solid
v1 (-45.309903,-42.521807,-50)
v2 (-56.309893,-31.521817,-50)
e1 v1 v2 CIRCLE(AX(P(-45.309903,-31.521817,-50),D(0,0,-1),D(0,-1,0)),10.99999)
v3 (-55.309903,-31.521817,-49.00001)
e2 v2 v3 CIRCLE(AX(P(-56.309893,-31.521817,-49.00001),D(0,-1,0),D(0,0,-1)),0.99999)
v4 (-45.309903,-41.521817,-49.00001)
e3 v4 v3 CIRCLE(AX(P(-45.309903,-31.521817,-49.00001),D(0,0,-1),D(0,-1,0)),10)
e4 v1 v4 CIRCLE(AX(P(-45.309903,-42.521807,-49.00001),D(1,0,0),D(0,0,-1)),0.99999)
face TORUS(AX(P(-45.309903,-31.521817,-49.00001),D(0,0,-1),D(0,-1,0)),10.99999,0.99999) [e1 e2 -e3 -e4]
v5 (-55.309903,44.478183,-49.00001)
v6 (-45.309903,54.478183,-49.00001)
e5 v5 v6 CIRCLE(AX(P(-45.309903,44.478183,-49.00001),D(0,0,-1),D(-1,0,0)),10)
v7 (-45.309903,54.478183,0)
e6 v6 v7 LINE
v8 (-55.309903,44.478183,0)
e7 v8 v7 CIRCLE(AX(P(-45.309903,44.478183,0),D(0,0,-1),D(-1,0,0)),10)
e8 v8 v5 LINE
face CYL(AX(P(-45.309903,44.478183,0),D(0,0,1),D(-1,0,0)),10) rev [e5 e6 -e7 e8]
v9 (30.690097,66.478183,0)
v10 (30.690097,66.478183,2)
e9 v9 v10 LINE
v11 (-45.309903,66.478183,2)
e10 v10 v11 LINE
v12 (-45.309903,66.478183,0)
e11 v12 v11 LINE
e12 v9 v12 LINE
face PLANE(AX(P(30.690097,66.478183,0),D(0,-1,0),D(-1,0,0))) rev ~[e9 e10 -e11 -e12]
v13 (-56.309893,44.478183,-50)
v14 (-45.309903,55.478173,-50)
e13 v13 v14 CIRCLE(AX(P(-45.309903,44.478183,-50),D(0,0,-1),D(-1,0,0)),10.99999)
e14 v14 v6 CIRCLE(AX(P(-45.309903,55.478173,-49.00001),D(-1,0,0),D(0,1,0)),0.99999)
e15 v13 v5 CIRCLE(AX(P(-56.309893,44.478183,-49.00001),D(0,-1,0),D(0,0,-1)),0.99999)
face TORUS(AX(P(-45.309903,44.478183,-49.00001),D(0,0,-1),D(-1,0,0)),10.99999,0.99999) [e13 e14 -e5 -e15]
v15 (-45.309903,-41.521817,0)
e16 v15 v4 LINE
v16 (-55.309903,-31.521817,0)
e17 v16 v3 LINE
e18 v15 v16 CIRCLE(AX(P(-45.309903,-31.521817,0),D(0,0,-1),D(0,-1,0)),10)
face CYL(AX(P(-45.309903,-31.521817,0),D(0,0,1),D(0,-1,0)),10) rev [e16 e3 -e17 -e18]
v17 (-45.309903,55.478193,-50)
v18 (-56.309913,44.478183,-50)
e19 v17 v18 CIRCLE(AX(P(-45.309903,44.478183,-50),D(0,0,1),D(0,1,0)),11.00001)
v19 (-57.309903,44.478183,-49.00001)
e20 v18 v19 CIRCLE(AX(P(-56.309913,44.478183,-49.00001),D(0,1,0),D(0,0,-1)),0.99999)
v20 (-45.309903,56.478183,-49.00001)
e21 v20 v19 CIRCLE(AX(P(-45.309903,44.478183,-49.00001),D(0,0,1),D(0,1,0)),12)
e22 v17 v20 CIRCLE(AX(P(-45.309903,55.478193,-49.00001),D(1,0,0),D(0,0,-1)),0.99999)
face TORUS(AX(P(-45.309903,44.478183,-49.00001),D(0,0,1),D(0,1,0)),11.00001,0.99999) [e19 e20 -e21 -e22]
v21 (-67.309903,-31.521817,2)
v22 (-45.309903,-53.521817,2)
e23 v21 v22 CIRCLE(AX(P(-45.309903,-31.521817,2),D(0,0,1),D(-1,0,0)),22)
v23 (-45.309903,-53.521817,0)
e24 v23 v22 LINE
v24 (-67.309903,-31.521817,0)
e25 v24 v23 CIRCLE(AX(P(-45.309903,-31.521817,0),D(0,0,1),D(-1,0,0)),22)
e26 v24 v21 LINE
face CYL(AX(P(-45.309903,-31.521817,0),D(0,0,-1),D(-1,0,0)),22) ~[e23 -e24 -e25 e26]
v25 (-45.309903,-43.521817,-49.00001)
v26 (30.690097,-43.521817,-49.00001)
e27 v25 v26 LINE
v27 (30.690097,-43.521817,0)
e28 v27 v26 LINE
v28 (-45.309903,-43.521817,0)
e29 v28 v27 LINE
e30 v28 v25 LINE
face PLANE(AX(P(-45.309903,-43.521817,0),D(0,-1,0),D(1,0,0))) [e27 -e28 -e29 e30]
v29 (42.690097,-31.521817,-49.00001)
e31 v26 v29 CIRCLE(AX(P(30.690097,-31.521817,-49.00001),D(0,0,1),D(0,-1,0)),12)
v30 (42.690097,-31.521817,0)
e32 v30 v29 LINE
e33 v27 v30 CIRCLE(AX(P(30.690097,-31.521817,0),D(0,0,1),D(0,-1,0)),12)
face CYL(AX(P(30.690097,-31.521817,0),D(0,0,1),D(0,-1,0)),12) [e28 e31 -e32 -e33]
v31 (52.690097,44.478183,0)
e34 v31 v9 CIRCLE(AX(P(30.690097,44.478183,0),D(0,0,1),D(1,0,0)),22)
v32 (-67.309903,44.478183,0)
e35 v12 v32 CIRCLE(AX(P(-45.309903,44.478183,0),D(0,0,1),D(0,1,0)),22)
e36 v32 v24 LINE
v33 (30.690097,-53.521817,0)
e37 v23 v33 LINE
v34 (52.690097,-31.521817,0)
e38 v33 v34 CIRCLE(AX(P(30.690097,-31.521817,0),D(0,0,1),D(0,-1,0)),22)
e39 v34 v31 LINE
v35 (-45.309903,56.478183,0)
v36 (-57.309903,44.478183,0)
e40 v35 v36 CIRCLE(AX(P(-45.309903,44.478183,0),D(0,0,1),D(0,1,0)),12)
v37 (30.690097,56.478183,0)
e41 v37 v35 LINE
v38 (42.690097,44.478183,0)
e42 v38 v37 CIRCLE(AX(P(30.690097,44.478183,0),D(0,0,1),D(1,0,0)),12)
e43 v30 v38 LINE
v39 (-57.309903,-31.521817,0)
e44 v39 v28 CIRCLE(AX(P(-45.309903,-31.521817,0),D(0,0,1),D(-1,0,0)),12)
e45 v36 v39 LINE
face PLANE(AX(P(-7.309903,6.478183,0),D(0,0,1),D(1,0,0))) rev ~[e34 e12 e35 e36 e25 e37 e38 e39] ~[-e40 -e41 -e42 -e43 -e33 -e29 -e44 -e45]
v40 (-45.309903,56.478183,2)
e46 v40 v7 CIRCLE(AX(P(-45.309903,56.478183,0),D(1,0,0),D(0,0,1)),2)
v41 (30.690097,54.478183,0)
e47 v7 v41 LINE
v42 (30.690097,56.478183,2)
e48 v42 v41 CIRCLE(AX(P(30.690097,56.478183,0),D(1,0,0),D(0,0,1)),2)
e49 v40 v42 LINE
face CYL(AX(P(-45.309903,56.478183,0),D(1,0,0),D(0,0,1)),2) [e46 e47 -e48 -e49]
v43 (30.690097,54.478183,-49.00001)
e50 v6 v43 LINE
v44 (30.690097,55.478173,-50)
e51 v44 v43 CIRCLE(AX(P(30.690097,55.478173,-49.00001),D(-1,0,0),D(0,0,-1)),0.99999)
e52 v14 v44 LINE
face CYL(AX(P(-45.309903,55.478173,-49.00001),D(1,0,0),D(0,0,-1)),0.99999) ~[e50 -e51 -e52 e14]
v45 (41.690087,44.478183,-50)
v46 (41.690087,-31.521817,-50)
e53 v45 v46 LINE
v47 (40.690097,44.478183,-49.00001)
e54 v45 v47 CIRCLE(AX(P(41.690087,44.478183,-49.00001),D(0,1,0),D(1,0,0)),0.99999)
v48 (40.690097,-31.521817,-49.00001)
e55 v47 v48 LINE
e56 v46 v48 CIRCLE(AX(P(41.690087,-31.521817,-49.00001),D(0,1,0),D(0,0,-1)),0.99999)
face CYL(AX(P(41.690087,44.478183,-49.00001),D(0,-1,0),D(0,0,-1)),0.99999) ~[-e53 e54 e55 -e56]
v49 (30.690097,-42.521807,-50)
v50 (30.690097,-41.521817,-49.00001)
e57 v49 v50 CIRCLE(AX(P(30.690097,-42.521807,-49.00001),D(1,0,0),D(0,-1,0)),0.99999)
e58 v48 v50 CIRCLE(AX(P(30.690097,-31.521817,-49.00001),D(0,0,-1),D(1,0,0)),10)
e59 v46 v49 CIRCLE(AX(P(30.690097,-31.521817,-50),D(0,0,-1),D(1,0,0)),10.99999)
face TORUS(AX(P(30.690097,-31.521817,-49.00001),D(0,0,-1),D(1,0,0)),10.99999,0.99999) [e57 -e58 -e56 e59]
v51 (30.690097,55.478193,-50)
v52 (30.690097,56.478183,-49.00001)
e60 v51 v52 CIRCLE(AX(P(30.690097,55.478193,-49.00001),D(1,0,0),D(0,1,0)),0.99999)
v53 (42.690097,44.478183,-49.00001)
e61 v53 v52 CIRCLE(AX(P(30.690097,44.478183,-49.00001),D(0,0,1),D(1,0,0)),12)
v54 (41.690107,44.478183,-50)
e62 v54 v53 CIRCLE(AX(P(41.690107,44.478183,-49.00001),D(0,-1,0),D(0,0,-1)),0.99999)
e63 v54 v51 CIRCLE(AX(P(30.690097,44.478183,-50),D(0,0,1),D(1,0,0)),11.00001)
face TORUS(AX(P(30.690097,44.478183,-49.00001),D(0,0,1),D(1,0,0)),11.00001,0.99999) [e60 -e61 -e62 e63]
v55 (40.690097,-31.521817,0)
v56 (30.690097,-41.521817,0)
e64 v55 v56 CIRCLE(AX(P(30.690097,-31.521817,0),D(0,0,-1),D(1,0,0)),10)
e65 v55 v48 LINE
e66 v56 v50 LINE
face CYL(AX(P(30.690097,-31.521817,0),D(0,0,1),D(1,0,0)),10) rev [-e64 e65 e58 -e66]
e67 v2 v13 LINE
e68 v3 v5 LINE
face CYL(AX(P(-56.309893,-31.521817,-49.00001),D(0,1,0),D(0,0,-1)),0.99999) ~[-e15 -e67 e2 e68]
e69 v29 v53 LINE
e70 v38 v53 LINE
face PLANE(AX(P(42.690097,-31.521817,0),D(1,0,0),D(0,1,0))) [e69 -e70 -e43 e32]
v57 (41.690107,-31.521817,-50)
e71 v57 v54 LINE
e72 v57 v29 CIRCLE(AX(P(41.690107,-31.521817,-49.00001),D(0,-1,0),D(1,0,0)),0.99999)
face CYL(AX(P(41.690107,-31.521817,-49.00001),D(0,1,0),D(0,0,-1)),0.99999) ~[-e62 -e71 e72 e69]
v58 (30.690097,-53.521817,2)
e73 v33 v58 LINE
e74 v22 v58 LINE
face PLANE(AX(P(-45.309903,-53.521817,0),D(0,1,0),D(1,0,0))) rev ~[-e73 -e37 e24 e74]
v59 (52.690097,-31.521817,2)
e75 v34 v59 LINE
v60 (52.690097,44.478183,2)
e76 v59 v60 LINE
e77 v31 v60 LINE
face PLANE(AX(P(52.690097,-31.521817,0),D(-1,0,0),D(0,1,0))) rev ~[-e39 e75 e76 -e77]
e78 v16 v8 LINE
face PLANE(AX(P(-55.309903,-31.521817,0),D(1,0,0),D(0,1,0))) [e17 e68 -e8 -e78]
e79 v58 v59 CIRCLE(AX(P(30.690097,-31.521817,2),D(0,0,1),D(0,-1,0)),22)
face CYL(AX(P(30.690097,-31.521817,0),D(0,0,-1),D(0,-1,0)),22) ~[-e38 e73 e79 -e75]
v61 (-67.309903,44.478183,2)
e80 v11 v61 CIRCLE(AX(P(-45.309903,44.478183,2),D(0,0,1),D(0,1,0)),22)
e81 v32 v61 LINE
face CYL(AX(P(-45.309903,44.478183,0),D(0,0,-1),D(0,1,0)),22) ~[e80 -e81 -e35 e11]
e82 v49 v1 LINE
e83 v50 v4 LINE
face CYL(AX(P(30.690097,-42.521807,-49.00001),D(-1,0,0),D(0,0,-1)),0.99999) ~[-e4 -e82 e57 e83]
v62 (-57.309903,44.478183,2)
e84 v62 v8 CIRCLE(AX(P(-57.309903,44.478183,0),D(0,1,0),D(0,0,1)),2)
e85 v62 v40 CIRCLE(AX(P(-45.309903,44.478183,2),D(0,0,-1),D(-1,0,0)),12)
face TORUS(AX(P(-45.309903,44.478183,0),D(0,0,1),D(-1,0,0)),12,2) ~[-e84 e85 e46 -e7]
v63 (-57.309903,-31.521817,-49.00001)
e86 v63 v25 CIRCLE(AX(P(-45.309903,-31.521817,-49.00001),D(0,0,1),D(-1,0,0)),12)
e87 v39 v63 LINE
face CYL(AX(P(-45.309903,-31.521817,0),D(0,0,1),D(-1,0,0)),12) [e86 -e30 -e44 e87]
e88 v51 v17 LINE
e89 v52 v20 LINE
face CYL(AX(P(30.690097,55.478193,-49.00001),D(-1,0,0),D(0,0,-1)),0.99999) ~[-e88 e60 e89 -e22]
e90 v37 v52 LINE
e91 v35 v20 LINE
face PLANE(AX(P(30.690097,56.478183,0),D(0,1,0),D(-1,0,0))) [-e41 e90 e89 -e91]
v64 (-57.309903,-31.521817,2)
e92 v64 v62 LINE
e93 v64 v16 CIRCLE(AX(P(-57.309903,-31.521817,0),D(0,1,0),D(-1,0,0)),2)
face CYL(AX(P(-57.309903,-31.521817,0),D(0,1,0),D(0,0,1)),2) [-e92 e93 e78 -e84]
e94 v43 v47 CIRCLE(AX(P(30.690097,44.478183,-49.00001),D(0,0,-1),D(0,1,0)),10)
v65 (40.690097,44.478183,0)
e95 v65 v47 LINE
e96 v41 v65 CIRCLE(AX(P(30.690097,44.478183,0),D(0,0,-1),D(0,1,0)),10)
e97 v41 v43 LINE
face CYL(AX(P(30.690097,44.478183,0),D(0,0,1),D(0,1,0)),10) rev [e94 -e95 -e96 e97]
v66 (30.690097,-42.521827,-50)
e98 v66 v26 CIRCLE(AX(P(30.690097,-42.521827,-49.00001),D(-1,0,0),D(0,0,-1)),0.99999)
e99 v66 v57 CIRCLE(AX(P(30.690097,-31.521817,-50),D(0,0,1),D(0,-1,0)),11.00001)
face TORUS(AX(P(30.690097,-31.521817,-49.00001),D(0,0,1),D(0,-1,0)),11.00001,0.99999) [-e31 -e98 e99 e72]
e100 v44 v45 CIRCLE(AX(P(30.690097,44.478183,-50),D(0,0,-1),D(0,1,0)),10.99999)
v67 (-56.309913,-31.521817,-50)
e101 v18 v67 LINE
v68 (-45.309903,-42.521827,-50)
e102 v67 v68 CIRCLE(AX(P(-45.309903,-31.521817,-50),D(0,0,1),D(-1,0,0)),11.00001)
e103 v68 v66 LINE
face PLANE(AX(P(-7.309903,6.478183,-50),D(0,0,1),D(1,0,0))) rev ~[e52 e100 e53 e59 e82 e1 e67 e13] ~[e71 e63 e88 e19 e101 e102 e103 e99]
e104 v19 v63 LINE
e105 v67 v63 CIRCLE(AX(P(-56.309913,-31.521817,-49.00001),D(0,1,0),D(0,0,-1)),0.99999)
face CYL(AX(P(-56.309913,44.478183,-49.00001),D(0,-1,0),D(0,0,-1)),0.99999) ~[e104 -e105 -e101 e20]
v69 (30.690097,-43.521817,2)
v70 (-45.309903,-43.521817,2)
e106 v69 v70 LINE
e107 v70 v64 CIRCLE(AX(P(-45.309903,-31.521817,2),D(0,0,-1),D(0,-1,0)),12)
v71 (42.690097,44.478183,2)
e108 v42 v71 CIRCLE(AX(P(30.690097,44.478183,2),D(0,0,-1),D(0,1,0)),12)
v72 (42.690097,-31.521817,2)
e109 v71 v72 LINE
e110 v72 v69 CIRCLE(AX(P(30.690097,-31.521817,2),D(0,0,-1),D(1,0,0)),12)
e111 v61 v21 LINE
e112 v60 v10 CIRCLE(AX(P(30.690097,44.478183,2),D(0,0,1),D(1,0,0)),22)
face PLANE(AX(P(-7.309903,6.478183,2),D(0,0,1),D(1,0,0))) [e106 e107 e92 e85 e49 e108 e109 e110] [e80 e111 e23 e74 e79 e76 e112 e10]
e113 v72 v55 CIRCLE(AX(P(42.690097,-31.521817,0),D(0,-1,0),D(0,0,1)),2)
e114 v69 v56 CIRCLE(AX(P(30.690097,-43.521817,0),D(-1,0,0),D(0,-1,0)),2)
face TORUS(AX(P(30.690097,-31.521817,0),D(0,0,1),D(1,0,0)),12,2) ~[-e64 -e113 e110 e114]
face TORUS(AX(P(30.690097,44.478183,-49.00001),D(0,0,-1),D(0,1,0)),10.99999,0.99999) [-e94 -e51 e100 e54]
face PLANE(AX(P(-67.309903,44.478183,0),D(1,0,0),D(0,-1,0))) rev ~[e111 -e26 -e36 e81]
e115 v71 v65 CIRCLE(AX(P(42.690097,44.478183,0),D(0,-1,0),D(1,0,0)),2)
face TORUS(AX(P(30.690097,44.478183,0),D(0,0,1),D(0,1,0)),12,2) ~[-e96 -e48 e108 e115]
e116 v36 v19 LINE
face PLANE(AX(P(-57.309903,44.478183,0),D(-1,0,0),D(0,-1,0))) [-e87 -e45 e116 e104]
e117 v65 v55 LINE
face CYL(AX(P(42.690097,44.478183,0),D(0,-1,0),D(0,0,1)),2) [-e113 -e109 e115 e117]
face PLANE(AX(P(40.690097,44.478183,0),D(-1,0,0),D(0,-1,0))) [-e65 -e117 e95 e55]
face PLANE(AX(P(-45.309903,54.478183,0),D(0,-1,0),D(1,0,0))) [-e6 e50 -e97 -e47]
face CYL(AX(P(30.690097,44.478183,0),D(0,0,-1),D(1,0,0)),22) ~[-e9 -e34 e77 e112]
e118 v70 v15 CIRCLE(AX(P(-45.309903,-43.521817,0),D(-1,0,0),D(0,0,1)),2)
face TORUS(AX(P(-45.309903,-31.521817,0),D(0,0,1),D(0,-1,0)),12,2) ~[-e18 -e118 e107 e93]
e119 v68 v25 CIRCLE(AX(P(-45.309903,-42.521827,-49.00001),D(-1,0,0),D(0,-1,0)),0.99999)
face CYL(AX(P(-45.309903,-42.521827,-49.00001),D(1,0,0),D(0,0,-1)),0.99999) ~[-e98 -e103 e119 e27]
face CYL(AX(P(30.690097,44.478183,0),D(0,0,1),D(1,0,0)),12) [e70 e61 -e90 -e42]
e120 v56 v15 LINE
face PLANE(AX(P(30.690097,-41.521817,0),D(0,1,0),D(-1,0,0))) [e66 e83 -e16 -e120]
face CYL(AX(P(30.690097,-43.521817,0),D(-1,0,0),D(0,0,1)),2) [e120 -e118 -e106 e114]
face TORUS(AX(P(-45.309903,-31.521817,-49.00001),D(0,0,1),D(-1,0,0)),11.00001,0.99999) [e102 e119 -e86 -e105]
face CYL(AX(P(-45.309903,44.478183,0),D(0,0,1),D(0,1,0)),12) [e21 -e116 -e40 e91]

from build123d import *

# Parameters (mm, degrees)
F1_DEPTH = 2
F3_DEPTH = 50
F4_R     = 0.99999
F5_R     = 2


# Not quite as in the source:
# - a fillet or chamfer is up to 0.001 mm smaller than in the source, because OpenCascade refuses the exact size


with BuildPart() as f1:
    # F0 (on Top) → F1 (new body)
    with BuildSketch(Plane.XY):
        with BuildLine():
            Line((-67.3099028766, 44.4781833887), (-67.3099028766, -31.5218166113))
            ThreePointArc((-67.3099028766, -31.5218166113), (-60.8662520627, -47.0781657974), (-45.3099028766, -53.5218166113))
            Line((-45.3099028766, -53.5218166113), (30.6900971234, -53.5218166113))
            ThreePointArc((30.6900971234, -53.5218166113), (46.2464463095, -47.0781657974), (52.6900971234, -31.5218166113))
            Line((52.6900971234, -31.5218166113), (52.6900971234, 44.4781833887))
            ThreePointArc((52.6900971234, 44.4781833887), (46.2464463095, 60.0345325748), (30.6900971234, 66.4781833887))
            Line((30.6900971234, 66.4781833887), (-45.3099028766, 66.4781833887))
            ThreePointArc((-45.3099028766, 66.4781833887), (-60.8662520627, 60.0345325748), (-67.3099028766, 44.4781833887))
        make_face()
        with BuildLine():
            ThreePointArc((-55.3099028766, 44.4781833887), (-52.3809706885, 51.5492512006), (-45.3099028766, 54.4781833887))
            Line((-45.3099028766, 54.4781833887), (30.6900971234, 54.4781833887))
            ThreePointArc((30.6900971234, 54.4781833887), (37.7611649352, 51.5492512006), (40.6900971234, 44.4781833887))
            Line((40.6900971234, 44.4781833887), (40.6900971234, -31.5218166113))
            ThreePointArc((40.6900971234, -31.5218166113), (37.7611649352, -38.5928844232), (30.6900971234, -41.5218166113))
            Line((30.6900971234, -41.5218166113), (-45.3099028766, -41.5218166113))
            ThreePointArc((-45.3099028766, -41.5218166113), (-52.3809706885, -38.5928844232), (-55.3099028766, -31.5218166113))
            Line((-55.3099028766, -31.5218166113), (-55.3099028766, 44.4781833887))
        make_face(mode=Mode.SUBTRACT)
    extrude(amount=F1_DEPTH)

    # F2 (on Top) → F3 (join)
    with BuildSketch(Plane.XY):
        with BuildLine():
            Line((-45.3099028766, -43.5218166113), (30.6900971234, -43.5218166113))
            ThreePointArc((30.6900971234, -43.5218166113), (39.1753784976, -40.0070979855), (42.6900971234, -31.5218166113))
            Line((42.6900971234, -31.5218166113), (42.6900971234, 44.4781833887))
            ThreePointArc((42.6900971234, 44.4781833887), (39.1753784976, 52.9634647629), (30.6900971234, 56.4781833887))
            Line((30.6900971234, 56.4781833887), (-45.3099028766, 56.4781833887))
            ThreePointArc((-45.3099028766, 56.4781833887), (-53.7951842509, 52.9634647629), (-57.3099028766, 44.4781833887))
            Line((-57.3099028766, 44.4781833887), (-57.3099028766, -31.5218166113))
            ThreePointArc((-57.3099028766, -31.5218166113), (-53.7951842509, -40.0070979855), (-45.3099028766, -43.5218166113))
        make_face()
        with BuildLine():
            Line((-45.3099028766, 54.4781833887), (30.6900971234, 54.4781833887))
            ThreePointArc((30.6900971234, 54.4781833887), (37.7611649352, 51.5492512006), (40.6900971234, 44.4781833887))
            Line((40.6900971234, 44.4781833887), (40.6900971234, -31.5218166113))
            ThreePointArc((40.6900971234, -31.5218166113), (37.7611649352, -38.5928844232), (30.6900971234, -41.5218166113))
            Line((30.6900971234, -41.5218166113), (-45.3099028766, -41.5218166113))
            ThreePointArc((-45.3099028766, -41.5218166113), (-52.3809706885, -38.5928844232), (-55.3099028766, -31.5218166113))
            Line((-55.3099028766, -31.5218166113), (-55.3099028766, 44.4781833887))
            ThreePointArc((-55.3099028766, 44.4781833887), (-52.3809706885, 51.5492512006), (-45.3099028766, 54.4781833887))
        make_face(mode=Mode.SUBTRACT)
    extrude(amount=-F3_DEPTH)

    # F4 (radius 1 in the source; OpenCascade refuses exactly that, so slightly less here)
    f4_edges = [f1.edges().sort_by_distance(p)[0] for p in [
        (-55.309903, 6.478183, -50),
        (-57.309903, 6.478183, -50),
    ]]
    fillet(f4_edges, radius=F4_R)

    # F5
    f5_edges = [f1.edges().sort_by_distance(p)[0] for p in [
        (-7.309903, 54.478183, 2),
    ]]
    fillet(f5_edges, radius=F5_R)


solid = f1.part
